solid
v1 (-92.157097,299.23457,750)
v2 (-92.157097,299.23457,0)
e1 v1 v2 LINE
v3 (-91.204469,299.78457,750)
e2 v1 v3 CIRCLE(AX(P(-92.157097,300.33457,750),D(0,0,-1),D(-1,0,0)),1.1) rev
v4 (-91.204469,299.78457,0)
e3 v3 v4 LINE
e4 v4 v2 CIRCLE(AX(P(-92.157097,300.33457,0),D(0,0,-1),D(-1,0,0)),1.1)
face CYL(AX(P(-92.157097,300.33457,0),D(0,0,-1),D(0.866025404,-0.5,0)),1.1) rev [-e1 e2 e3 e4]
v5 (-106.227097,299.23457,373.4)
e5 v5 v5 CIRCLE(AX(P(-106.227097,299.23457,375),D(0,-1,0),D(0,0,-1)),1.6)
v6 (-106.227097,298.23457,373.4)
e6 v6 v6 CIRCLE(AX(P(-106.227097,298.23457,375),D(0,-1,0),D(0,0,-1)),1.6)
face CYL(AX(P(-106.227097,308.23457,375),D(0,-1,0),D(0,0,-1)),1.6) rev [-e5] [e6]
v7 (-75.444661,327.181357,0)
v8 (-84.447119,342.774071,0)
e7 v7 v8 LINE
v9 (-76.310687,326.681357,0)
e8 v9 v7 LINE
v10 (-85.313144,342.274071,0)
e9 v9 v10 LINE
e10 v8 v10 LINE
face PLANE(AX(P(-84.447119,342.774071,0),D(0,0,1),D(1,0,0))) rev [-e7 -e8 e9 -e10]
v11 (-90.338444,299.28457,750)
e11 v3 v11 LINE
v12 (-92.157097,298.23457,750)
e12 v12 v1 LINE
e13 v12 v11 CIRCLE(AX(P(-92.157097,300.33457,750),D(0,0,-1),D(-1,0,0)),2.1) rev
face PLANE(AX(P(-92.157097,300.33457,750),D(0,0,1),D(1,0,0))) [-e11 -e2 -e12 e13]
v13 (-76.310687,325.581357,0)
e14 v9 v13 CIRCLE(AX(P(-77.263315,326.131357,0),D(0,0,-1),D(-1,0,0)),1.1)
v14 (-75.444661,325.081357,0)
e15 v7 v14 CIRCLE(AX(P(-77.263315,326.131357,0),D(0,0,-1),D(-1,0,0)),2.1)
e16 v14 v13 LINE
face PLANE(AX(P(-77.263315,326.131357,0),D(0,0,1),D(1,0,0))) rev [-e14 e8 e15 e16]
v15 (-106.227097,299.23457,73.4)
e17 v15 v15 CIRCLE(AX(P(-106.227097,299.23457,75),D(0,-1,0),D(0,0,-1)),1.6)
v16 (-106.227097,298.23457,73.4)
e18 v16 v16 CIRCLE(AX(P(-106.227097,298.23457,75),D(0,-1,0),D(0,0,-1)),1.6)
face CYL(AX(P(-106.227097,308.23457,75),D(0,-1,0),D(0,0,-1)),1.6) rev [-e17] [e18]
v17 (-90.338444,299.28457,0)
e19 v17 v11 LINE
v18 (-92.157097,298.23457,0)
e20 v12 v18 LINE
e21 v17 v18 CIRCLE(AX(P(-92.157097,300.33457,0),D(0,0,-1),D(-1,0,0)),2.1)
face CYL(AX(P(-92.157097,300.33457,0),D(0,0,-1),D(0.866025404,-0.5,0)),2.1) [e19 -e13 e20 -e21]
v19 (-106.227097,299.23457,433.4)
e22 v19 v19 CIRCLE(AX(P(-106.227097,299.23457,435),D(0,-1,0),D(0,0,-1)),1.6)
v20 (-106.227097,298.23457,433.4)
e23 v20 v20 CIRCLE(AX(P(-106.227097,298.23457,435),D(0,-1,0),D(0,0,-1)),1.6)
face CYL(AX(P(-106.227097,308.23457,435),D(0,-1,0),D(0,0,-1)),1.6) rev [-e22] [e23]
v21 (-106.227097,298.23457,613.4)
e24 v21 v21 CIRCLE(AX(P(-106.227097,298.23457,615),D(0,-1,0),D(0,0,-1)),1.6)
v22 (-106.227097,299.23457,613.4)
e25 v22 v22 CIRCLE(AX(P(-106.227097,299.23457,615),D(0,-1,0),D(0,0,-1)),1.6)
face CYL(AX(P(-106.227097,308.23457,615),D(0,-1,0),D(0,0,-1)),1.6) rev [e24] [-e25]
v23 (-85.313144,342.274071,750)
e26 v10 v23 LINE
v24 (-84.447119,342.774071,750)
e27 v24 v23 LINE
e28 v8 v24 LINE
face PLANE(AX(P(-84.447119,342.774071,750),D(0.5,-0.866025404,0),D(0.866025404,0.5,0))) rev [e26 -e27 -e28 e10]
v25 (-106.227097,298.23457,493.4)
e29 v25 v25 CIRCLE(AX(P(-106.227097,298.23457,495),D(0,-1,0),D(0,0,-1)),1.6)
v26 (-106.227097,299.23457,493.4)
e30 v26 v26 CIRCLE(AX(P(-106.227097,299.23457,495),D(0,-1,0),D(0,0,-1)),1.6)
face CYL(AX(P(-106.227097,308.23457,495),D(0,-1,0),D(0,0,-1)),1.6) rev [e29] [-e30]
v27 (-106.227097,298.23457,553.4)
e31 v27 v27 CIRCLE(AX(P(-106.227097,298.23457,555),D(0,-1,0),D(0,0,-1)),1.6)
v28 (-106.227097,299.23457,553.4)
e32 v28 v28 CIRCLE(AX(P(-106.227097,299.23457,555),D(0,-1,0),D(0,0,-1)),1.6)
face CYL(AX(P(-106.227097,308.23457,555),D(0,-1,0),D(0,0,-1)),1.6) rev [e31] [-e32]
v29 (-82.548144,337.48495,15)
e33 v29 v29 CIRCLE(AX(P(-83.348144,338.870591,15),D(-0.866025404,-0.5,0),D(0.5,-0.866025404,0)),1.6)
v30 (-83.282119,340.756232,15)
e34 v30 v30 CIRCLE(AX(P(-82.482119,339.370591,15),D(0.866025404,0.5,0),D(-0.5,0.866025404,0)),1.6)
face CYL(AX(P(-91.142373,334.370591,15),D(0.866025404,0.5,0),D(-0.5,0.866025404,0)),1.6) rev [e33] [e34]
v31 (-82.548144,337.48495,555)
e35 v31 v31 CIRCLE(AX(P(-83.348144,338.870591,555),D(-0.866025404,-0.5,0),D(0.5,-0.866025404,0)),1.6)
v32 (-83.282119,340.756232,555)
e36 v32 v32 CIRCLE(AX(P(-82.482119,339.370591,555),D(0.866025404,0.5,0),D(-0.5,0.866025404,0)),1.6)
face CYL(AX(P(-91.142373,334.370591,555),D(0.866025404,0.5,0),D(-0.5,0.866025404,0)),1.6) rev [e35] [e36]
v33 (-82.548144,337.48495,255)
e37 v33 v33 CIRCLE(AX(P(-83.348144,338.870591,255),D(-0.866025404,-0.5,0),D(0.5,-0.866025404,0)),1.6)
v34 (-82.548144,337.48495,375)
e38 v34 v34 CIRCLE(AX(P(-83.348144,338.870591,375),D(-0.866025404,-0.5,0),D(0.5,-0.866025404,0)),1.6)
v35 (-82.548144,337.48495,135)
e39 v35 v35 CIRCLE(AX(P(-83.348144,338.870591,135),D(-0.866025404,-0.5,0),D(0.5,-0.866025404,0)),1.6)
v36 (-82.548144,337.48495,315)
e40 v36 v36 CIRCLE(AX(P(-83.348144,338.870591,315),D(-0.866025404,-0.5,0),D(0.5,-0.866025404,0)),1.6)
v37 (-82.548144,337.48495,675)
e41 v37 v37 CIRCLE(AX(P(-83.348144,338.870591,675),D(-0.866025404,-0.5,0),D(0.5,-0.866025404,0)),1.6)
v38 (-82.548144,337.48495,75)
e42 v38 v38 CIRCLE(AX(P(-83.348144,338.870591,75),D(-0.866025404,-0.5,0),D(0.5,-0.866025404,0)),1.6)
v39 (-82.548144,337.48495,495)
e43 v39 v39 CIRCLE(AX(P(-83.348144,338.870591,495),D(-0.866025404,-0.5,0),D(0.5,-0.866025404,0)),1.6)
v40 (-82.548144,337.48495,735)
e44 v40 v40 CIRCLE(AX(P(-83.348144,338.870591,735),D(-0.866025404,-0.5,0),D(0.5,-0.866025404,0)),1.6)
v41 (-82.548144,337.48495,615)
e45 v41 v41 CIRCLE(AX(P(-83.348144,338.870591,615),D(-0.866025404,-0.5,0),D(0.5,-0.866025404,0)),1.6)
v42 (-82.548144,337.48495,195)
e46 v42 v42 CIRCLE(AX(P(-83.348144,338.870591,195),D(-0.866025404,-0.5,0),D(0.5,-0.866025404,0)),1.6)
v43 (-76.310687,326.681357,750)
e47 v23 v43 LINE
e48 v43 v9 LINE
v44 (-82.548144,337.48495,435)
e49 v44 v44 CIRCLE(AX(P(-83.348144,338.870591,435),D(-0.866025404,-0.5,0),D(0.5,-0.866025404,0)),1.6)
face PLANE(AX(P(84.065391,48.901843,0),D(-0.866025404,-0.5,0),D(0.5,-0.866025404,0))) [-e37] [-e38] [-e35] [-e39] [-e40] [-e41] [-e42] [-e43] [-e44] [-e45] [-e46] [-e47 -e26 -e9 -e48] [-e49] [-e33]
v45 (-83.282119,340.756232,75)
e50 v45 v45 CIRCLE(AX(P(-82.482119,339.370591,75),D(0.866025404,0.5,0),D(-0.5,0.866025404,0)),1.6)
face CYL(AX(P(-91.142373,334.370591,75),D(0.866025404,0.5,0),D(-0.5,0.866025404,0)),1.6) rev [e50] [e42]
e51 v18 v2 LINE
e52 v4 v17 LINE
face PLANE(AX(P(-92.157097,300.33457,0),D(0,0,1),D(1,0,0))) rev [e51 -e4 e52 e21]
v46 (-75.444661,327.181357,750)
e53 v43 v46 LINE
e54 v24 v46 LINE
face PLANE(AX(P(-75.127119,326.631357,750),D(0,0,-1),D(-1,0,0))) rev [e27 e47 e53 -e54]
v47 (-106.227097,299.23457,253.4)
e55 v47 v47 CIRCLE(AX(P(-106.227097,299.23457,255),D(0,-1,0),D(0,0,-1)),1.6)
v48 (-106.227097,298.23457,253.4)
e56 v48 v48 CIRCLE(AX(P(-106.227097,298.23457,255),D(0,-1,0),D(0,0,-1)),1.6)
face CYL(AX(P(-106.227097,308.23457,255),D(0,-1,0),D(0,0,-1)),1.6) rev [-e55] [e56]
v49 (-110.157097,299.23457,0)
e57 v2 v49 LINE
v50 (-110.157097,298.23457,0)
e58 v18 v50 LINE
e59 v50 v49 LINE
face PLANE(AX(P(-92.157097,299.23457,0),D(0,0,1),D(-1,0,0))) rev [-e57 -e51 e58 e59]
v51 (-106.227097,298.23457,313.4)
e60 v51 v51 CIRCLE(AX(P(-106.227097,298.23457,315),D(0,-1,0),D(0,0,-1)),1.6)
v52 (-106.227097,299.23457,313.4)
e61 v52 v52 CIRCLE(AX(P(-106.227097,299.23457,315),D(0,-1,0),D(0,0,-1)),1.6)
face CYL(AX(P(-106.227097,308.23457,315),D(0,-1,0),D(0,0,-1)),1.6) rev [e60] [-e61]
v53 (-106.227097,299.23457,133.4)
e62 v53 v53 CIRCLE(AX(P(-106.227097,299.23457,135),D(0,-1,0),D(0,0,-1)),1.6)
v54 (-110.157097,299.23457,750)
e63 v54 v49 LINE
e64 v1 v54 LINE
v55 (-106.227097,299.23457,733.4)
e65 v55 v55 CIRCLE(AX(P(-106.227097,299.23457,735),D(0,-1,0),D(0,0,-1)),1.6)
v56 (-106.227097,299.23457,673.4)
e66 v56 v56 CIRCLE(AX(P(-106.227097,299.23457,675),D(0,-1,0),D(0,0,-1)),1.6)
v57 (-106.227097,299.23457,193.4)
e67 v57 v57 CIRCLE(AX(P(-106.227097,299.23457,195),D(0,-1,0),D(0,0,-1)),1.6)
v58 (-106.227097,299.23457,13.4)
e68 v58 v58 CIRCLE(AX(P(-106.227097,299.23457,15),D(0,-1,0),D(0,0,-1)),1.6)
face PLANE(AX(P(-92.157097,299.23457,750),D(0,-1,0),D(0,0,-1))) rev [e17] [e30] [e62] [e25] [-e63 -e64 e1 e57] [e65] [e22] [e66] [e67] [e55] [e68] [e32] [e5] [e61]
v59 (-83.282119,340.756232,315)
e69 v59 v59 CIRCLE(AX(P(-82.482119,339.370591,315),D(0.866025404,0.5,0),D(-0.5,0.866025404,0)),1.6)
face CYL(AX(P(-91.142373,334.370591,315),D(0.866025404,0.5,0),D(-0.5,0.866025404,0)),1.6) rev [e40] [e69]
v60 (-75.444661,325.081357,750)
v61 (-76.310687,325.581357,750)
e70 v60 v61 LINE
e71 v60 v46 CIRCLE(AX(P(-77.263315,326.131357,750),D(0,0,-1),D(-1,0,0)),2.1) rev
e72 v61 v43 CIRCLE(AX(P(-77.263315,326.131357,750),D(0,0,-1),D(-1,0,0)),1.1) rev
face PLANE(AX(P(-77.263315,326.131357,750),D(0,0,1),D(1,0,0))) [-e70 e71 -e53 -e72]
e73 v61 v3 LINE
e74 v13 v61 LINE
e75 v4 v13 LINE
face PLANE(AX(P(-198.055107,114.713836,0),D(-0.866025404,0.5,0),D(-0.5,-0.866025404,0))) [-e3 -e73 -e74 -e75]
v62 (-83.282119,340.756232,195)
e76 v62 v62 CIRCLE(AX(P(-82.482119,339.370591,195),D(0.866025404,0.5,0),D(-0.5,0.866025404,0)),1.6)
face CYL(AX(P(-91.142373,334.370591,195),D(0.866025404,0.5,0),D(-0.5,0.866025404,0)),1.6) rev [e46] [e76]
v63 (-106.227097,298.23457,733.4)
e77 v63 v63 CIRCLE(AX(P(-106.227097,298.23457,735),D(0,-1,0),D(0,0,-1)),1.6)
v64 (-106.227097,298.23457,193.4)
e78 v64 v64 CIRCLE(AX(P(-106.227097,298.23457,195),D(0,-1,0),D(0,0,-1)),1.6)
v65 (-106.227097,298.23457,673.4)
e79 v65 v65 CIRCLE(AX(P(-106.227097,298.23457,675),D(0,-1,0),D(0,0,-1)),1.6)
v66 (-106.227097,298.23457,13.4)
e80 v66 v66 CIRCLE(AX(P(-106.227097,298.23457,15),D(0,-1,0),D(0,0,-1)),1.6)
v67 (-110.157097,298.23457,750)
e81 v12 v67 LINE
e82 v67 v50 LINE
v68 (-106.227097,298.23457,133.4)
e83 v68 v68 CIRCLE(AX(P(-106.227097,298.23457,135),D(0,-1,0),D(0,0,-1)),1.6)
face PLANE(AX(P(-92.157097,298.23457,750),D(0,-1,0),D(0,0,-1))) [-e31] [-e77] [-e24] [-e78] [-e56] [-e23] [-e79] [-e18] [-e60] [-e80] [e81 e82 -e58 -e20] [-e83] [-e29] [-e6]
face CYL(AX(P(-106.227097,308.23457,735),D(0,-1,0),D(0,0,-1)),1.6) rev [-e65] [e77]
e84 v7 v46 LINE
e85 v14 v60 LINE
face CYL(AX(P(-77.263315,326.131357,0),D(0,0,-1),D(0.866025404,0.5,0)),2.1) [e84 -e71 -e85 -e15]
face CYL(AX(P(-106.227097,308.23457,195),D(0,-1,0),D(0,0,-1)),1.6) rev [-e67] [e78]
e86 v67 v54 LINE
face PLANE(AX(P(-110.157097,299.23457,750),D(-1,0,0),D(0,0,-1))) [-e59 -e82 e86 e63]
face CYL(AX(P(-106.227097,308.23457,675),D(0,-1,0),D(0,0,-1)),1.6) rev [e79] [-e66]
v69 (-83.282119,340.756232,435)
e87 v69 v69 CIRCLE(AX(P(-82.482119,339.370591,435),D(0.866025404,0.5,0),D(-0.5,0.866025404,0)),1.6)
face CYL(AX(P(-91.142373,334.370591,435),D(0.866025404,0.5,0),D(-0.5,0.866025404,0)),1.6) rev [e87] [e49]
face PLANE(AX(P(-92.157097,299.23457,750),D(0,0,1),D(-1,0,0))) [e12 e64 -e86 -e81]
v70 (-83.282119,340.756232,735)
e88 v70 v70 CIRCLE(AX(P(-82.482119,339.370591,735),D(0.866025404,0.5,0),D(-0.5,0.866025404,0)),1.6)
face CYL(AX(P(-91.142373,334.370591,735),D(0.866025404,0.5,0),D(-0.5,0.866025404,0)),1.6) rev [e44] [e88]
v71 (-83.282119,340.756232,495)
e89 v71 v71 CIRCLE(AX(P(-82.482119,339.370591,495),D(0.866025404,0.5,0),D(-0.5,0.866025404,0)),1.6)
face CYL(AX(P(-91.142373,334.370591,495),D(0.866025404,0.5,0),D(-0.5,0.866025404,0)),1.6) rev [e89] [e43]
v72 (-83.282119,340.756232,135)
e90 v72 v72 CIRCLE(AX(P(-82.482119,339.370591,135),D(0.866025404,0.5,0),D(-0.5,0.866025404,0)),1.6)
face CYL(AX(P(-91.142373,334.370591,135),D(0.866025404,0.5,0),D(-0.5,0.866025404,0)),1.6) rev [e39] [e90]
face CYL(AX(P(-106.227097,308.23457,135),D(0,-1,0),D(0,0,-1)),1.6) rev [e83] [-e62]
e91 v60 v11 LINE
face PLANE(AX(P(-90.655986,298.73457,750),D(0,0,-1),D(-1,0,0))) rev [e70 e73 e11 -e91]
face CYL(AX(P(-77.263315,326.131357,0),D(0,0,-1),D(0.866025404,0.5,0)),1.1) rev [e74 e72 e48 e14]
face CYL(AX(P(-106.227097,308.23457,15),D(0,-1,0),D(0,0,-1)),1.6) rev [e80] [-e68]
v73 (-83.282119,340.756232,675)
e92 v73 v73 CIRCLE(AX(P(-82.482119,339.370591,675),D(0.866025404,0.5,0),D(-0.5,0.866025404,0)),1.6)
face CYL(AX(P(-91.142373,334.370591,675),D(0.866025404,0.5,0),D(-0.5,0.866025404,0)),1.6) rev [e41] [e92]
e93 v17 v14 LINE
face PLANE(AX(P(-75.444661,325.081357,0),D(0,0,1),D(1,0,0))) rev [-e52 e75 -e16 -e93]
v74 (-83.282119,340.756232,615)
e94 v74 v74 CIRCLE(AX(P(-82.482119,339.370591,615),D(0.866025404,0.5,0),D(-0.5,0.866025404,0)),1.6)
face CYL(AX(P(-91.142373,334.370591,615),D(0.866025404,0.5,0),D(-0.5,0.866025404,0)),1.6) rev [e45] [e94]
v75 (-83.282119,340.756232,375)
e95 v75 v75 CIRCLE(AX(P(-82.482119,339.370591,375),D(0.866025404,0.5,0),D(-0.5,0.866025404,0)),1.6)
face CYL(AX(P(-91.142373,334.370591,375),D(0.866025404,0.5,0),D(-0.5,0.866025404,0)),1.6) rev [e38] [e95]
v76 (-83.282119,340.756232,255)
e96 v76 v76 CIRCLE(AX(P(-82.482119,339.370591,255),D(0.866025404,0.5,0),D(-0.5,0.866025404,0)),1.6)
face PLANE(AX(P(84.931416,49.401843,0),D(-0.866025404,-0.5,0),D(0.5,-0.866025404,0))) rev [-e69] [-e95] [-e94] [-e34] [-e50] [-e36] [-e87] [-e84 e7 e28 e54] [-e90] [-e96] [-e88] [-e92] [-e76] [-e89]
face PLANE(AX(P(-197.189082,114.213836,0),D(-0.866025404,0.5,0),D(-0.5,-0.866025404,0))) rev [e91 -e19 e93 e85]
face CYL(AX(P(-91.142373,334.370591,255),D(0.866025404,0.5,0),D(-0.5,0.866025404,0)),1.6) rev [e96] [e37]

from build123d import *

# Parameters (mm, degrees)
SKETCH2_W           = 18
SKETCH2_H           = 1
BOSS_EXTRUDE2_DEPTH = 750
EDGE_FLANGE9_DEPTH  = 750
EDGE_FLANGE10_DEPTH = 750
SKETCH50_R          = 1.6
CUT_EXTRUDE1_DEPTH  = 10
SKETCH51_R          = 1.6
CUT_EXTRUDE2_DEPTH  = 10


# Sheet-metal steps are written as plain solids
with BuildPart() as part:
    # Sketch2 → Boss-Extrude2 (new body)
    with BuildSketch(Plane.XY):
        with Locations((-101.157096866, 298.73456983)):
            Rectangle(SKETCH2_W, SKETCH2_H)
    extrude(amount=BOSS_EXTRUDE2_DEPTH)

    # Edge-Flange9 section (across the edge) → Edge-Flange9 (add)
    with BuildSketch(Plane(origin=(-91.52201157, 299.23456983, 750), x_dir=(-0.8660254037844364, 0.5000000000000041, 0), z_dir=(0, 0, -1))):
        with BuildLine():
            Line((-1, 0.635085296), (-1, 30.422649731))
            Line((-1, 30.422649731), (0, 30.422649731))
            Line((0, 30.422649731), (0, 0.635085296))
            ThreePointArc((0, 0.635085296), (0.147372056, 0.085085296), (0.55, -0.317542648))
            Line((0.55, -0.317542648), (0.05, -1.183568052))
            ThreePointArc((0.05, -1.183568052), (-0.718653348, -0.414914704), (-1, 0.635085296))
        make_face()
    extrude(amount=EDGE_FLANGE9_DEPTH)

    # Edge-Flange10 section (across the edge) → Edge-Flange10 (add)
    with BuildSketch(Plane(origin=(-75.993144057, 326.131357347, 750), x_dir=(-0.8660254037844436, -0.49999999999999156, 0), z_dir=(0, 0, -1))):
        with BuildLine():
            Line((-1, 0.635085296), (-1, 18.64))
            Line((-1, 18.64), (0, 18.64))
            Line((0, 18.64), (0, 0.635085296))
            ThreePointArc((0, 0.635085296), (0.147372056, 0.085085296), (0.55, -0.317542648))
            Line((0.55, -0.317542648), (0.05, -1.183568052))
            ThreePointArc((0.05, -1.183568052), (-0.718653348, -0.414914704), (-1, 0.635085296))
        make_face()
    extrude(amount=EDGE_FLANGE10_DEPTH)

    # Sketch50 → Cut-Extrude1 (cut)
    with BuildSketch(Plane.XZ.offset(-298.23456983)):
        with Locations(Location((-106.227096866, 735, 0), (0, 0, 270))):
            Circle(SKETCH50_R)
        with Locations(Location((-106.227096866, 15, 0), (0, 0, 270))):
            Circle(SKETCH50_R)
        with Locations(Location((-106.227096866, 75, 0), (0, 0, 270))):
            Circle(SKETCH50_R)
        with Locations(Location((-106.227096866, 135, 0), (0, 0, 270))):
            Circle(SKETCH50_R)
        with Locations(Location((-106.227096866, 195, 0), (0, 0, 270))):
            Circle(SKETCH50_R)
        with Locations(Location((-106.227096866, 255, 0), (0, 0, 270))):
            Circle(SKETCH50_R)
        with Locations(Location((-106.227096866, 315, 0), (0, 0, 270))):
            Circle(SKETCH50_R)
        with Locations(Location((-106.227096866, 375, 0), (0, 0, 270))):
            Circle(SKETCH50_R)
        with Locations(Location((-106.227096866, 435, 0), (0, 0, 270))):
            Circle(SKETCH50_R)
        with Locations(Location((-106.227096866, 495, 0), (0, 0, 270))):
            Circle(SKETCH50_R)
        with Locations(Location((-106.227096866, 555, 0), (0, 0, 270))):
            Circle(SKETCH50_R)
        with Locations(Location((-106.227096866, 615, 0), (0, 0, 270))):
            Circle(SKETCH50_R)
        with Locations(Location((-106.227096866, 675, 0), (0, 0, 270))):
            Circle(SKETCH50_R)
    extrude(amount=-CUT_EXTRUDE1_DEPTH, mode=Mode.SUBTRACT)

    # Sketch51 → Cut-Extrude2 (cut)
    with BuildSketch(Plane(origin=(85.090187578, 49.126842704, 0), x_dir=(0, 0, -1), z_dir=(0.8660254037844434, 0.499999999999992, 0))):
        with Locations(Location((-735, 335.144612461, 0), (0, 0, 90))):
            Circle(SKETCH51_R)
        with Locations(Location((-15, 335.144612461, 0), (0, 0, 90))):
            Circle(SKETCH51_R)
        with Locations(Location((-75, 335.144612461, 0), (0, 0, 90))):
            Circle(SKETCH51_R)
        with Locations(Location((-135, 335.144612461, 0), (0, 0, 90))):
            Circle(SKETCH51_R)
        with Locations(Location((-195, 335.144612461, 0), (0, 0, 90))):
            Circle(SKETCH51_R)
        with Locations(Location((-255, 335.144612461, 0), (0, 0, 90))):
            Circle(SKETCH51_R)
        with Locations(Location((-315, 335.144612461, 0), (0, 0, 90))):
            Circle(SKETCH51_R)
        with Locations(Location((-375, 335.144612461, 0), (0, 0, 90))):
            Circle(SKETCH51_R)
        with Locations(Location((-435, 335.144612461, 0), (0, 0, 90))):
            Circle(SKETCH51_R)
        with Locations(Location((-495, 335.144612461, 0), (0, 0, 90))):
            Circle(SKETCH51_R)
        with Locations(Location((-555, 335.144612461, 0), (0, 0, 90))):
            Circle(SKETCH51_R)
        with Locations(Location((-615, 335.144612461, 0), (0, 0, 90))):
            Circle(SKETCH51_R)
        with Locations(Location((-675, 335.144612461, 0), (0, 0, 90))):
            Circle(SKETCH51_R)
    extrude(amount=-CUT_EXTRUDE2_DEPTH, mode=Mode.SUBTRACT)


solid = part.part
